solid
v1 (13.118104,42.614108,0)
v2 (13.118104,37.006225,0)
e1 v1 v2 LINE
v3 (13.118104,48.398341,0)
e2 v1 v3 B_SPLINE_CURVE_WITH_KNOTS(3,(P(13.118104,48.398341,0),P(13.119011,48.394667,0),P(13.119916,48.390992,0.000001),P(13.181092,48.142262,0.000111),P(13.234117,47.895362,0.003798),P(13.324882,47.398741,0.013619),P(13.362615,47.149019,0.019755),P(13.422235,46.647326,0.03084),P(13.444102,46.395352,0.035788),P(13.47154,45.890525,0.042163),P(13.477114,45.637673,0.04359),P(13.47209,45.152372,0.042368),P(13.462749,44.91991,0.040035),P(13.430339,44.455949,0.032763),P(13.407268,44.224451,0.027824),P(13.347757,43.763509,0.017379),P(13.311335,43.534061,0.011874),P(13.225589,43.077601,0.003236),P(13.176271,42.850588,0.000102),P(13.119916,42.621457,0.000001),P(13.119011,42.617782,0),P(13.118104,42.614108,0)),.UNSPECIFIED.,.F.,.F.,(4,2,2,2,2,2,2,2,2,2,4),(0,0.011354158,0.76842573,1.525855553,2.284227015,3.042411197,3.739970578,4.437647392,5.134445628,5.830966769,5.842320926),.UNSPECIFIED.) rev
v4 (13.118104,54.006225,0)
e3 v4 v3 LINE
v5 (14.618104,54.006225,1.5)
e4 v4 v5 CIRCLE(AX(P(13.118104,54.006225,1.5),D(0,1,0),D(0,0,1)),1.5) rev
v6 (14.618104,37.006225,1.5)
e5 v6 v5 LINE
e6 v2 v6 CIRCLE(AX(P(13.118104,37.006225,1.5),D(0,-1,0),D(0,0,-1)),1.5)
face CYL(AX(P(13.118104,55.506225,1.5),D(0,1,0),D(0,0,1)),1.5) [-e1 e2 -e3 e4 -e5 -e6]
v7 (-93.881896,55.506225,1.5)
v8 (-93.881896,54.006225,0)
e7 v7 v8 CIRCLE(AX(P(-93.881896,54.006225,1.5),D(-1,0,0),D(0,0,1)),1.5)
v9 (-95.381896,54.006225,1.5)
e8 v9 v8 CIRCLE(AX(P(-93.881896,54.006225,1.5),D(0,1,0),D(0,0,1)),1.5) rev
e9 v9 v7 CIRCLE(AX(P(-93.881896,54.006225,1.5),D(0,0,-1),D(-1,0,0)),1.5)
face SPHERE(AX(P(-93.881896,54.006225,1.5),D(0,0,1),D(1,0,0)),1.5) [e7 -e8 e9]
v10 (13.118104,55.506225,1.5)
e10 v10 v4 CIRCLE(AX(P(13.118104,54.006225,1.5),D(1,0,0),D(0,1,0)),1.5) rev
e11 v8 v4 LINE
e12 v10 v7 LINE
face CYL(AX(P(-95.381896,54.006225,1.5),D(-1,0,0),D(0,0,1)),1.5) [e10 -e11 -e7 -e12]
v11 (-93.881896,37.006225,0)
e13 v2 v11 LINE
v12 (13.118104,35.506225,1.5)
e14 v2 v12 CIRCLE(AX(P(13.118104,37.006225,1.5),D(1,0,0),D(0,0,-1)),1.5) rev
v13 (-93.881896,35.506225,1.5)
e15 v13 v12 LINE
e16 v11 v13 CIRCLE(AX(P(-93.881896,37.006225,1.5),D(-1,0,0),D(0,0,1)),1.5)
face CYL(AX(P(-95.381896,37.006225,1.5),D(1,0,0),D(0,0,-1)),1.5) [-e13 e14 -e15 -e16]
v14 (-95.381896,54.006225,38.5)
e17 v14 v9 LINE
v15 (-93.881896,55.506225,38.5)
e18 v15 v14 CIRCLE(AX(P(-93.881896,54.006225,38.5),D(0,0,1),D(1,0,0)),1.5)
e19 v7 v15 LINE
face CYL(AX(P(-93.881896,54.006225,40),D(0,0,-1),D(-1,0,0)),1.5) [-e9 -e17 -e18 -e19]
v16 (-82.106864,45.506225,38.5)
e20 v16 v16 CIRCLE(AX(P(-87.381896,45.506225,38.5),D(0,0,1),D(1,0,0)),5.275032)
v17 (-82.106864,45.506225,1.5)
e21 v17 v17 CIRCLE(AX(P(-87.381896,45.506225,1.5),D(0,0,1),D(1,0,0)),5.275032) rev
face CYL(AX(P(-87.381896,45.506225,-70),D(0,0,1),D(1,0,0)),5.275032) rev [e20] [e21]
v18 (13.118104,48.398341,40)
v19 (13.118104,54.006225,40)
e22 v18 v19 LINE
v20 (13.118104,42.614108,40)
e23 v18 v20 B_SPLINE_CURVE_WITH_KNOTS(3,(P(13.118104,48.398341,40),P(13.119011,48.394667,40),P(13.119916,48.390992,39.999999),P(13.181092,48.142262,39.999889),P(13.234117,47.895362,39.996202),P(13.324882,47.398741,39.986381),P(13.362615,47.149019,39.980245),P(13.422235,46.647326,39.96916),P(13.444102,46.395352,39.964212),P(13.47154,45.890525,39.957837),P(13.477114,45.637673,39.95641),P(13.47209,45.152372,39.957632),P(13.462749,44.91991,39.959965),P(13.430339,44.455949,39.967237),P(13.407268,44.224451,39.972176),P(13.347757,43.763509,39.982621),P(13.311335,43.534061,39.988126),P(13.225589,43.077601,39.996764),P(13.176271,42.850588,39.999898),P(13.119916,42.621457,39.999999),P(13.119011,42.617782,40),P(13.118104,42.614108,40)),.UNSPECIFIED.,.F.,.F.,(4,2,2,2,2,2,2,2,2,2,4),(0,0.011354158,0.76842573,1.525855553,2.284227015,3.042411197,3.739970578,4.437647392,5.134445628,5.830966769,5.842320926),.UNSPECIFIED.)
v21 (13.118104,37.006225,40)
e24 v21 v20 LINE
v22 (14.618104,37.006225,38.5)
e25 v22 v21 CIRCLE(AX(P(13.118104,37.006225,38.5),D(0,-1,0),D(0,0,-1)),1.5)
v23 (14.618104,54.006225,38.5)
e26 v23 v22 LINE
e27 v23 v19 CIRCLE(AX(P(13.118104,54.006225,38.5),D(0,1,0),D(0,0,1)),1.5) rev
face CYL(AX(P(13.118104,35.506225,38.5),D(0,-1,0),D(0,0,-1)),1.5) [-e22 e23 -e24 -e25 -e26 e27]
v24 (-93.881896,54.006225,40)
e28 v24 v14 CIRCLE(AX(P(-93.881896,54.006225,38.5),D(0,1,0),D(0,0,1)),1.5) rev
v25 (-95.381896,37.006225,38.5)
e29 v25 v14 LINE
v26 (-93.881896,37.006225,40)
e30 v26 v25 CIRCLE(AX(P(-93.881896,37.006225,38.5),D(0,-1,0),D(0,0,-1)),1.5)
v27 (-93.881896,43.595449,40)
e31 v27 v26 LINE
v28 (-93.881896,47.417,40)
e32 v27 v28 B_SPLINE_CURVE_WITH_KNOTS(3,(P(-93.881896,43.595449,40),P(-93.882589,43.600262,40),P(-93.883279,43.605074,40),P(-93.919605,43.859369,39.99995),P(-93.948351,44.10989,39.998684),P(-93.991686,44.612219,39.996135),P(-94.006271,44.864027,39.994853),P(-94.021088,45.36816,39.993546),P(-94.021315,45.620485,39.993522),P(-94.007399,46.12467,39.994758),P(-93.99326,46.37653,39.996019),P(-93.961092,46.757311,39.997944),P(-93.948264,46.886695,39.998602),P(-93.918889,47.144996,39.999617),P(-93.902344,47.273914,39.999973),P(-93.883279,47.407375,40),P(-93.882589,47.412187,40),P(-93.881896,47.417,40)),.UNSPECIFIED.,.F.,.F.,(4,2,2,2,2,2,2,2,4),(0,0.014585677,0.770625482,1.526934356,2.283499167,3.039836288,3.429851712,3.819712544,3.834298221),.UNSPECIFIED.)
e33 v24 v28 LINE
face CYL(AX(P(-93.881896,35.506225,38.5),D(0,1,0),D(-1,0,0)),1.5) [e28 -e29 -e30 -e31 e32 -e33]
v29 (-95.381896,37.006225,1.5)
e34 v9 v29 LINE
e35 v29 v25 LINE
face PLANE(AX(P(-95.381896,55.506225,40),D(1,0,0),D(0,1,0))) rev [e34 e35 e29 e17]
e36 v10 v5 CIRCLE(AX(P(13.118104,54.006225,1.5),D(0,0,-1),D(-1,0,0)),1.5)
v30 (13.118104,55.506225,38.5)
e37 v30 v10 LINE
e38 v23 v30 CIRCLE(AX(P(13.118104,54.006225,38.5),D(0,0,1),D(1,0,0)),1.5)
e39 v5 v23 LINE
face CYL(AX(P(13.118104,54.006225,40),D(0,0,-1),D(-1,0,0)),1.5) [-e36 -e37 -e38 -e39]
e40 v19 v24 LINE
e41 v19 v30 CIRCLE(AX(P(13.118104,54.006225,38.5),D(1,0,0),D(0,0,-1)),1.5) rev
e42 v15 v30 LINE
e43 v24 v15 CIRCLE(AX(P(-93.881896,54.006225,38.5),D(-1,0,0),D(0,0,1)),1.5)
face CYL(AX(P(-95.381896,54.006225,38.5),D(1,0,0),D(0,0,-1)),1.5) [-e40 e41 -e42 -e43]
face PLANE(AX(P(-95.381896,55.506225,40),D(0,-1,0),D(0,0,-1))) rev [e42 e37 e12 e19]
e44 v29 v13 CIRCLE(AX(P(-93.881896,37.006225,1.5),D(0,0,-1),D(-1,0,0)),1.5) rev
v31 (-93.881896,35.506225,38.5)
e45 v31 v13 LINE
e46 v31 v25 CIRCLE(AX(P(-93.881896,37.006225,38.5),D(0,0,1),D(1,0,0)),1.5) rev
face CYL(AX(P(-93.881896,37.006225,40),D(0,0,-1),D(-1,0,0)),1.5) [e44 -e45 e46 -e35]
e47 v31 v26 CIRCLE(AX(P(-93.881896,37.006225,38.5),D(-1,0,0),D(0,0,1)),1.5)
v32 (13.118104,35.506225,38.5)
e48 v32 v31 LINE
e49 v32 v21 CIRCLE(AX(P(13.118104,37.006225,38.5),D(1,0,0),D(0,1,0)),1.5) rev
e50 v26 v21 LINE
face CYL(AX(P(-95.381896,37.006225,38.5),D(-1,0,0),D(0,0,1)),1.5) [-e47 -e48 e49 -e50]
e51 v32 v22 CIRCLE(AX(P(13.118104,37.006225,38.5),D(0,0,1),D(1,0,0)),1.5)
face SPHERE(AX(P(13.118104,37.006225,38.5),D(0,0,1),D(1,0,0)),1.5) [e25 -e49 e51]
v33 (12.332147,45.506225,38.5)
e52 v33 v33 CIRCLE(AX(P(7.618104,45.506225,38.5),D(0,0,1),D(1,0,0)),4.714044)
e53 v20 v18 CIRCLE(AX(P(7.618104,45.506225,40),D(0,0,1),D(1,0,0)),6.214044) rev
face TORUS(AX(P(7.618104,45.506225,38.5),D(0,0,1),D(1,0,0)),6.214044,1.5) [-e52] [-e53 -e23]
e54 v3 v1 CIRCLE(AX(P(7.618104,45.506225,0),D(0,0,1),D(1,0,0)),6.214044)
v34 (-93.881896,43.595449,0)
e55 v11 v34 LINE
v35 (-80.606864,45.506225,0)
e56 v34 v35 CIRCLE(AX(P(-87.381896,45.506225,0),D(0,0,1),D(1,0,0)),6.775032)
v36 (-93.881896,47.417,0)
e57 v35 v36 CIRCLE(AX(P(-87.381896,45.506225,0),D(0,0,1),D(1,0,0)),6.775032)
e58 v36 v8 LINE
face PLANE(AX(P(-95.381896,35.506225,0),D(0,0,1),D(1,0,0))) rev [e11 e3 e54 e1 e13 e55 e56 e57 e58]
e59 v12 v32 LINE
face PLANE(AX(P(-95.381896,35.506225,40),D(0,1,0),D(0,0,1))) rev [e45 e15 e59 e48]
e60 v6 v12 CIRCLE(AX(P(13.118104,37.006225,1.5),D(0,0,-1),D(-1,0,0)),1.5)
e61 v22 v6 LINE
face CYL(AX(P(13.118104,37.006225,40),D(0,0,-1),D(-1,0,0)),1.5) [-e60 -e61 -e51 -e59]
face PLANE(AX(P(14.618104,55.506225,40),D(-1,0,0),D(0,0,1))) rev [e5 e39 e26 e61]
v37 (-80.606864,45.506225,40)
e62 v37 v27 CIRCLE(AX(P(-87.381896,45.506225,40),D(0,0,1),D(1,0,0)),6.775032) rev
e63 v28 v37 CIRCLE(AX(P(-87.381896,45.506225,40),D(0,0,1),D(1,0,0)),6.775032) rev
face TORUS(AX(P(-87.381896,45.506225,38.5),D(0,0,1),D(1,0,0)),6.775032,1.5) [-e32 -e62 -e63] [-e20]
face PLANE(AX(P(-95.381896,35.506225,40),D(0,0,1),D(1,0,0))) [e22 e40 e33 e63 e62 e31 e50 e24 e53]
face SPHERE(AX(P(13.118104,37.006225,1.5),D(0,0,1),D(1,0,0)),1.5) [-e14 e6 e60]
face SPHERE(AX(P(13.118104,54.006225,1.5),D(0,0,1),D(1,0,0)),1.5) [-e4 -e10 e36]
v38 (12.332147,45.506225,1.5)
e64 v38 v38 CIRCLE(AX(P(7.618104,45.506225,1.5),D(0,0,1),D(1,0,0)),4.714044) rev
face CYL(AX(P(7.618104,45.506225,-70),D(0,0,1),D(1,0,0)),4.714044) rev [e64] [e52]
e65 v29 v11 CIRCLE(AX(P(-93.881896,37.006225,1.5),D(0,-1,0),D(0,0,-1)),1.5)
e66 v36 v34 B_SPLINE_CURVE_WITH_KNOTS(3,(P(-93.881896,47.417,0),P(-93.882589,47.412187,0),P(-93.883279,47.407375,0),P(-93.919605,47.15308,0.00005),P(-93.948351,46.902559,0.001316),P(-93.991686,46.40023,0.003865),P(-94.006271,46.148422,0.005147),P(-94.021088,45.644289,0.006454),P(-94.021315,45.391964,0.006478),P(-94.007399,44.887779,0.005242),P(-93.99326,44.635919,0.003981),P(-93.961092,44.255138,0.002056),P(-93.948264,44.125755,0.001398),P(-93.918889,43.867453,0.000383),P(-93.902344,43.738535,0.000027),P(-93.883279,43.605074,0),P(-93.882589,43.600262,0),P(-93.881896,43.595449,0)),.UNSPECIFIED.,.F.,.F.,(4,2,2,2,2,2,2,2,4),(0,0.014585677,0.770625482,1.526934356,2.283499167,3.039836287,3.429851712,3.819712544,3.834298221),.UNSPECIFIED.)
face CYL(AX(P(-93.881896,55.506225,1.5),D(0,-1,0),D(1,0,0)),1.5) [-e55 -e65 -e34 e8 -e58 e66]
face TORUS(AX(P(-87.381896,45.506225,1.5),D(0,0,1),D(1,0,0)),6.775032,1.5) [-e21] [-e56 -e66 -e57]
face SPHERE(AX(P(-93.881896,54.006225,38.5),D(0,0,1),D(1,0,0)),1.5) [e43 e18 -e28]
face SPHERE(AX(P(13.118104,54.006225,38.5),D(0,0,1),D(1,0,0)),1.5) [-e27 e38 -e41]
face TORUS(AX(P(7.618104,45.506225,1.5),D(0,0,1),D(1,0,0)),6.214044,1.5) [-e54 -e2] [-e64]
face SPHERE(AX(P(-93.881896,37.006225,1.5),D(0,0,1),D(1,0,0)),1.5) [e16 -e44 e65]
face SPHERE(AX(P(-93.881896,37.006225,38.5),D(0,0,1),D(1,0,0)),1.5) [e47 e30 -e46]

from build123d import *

# Parameters (mm, degrees)
SKETCH1_W      = 110
SKETCH1_H      = 20
EXTRUDE1_DEPTH = 40
SKETCH2_R      = 5.275032214
SKETCH2_R_2    = 4.714043742
EXTRUDE2_DEPTH = 110
FILLET1_R      = 1.5


with BuildPart() as part:
    # Sketch1 → Extrude1 (new body)
    with BuildSketch(Plane.XY):
        with Locations((-40.381896345, 45.506224595)):
            Rectangle(SKETCH1_W, SKETCH1_H)
    extrude(amount=EXTRUDE1_DEPTH)

    # Sketch2 → Extrude2 (cut)
    with BuildSketch(Plane.XY.offset(40)):
        with Locations((-87.381896345, 45.506224595)):
            Circle(SKETCH2_R)
        with Locations((7.618103655, 45.506224595)):
            Circle(SKETCH2_R_2)
    extrude(amount=-EXTRUDE2_DEPTH, mode=Mode.SUBTRACT)

    # Fillet1
    # the kernel refuses this fillet: 1.5 mm, written as the material it takes off along each edge
    with BuildSketch(Plane(origin=(13.118103655, 54.006224595, 38.5), x_dir=(1, 0, 0), z_dir=(0, 1, 0))) as fillet1_piece_1_section:
        Polygon((0, 0), (FILLET1_R, 0), (FILLET1_R, -FILLET1_R), (0, -FILLET1_R), align=None)
    fillet1_piece_1 = extrude(amount=FILLET1_R, mode=Mode.PRIVATE)
    fillet1_piece_1 = fillet1_piece_1 - Plane(origin=(13.118103655, 54.006224595, 38.5), x_dir=(-0.7071067811865475, 0, -0.7071067811865475), z_dir=(0, 1, 0)) * Sphere(FILLET1_R, mode=Mode.PRIVATE)
    add(fillet1_piece_1, mode=Mode.SUBTRACT)
    with BuildSketch(Plane(origin=(13.118103655, 37.006224595, 38.5), x_dir=(0, 0, 1), z_dir=(1, 0, 0))) as fillet1_piece_2_section:
        Polygon((0, 0), (FILLET1_R, 0), (FILLET1_R, FILLET1_R), (0, FILLET1_R), align=None)
    fillet1_piece_2 = extrude(amount=FILLET1_R, mode=Mode.PRIVATE)
    fillet1_piece_2 = fillet1_piece_2 - Plane(origin=(13.118103655, 37.006224595, 38.5), x_dir=(0, 0.7071067811865475, -0.7071067811865475), z_dir=(1, 0, 0)) * Sphere(FILLET1_R, mode=Mode.PRIVATE)
    add(fillet1_piece_2, mode=Mode.SUBTRACT)
    with BuildSketch(Plane(origin=(-93.881896345, 54.006224595, 38.5), x_dir=(-1, 0, 0), z_dir=(0, 1, 0))) as fillet1_piece_3_section:
        Polygon((0, 0), (FILLET1_R, 0), (FILLET1_R, FILLET1_R), (0, FILLET1_R), align=None)
    fillet1_piece_3 = extrude(amount=FILLET1_R, mode=Mode.PRIVATE)
    fillet1_piece_3 = fillet1_piece_3 - Plane(origin=(-93.881896345, 54.006224595, 38.5), x_dir=(0.7071067811865475, 0, -0.7071067811865475), z_dir=(0, 1, 0)) * Sphere(FILLET1_R, mode=Mode.PRIVATE)
    add(fillet1_piece_3, mode=Mode.SUBTRACT)
    with BuildSketch(Plane(origin=(-93.881896345, 37.006224595, 38.5), x_dir=(0, 0, 1), z_dir=(-1, 0, 0))) as fillet1_piece_4_section:
        Polygon((0, 0), (FILLET1_R, 0), (FILLET1_R, -FILLET1_R), (0, -FILLET1_R), align=None)
    fillet1_piece_4 = extrude(amount=FILLET1_R, mode=Mode.PRIVATE)
    fillet1_piece_4 = fillet1_piece_4 - Plane(origin=(-93.881896345, 37.006224595, 38.5), x_dir=(0, 0.7071067811865475, -0.7071067811865475), z_dir=(-1, 0, 0)) * Sphere(FILLET1_R, mode=Mode.PRIVATE)
    add(fillet1_piece_4, mode=Mode.SUBTRACT)
    with BuildSketch(Plane(origin=(-93.881896345, 54.006224595, 1.5), x_dir=(-1, 0, 0), z_dir=(0, 1, 0))) as fillet1_piece_5_section:
        Polygon((0, 0), (FILLET1_R, 0), (FILLET1_R, -FILLET1_R), (0, -FILLET1_R), align=None)
    fillet1_piece_5 = extrude(amount=FILLET1_R, mode=Mode.PRIVATE)
    fillet1_piece_5 = fillet1_piece_5 - Plane(origin=(-93.881896345, 54.006224595, 1.5), x_dir=(0.7071067811865475, 0, 0.7071067811865475), z_dir=(0, 1, 0)) * Sphere(FILLET1_R, mode=Mode.PRIVATE)
    add(fillet1_piece_5, mode=Mode.SUBTRACT)
    with BuildSketch(Plane(origin=(13.118103655, 54.006224595, 1.5), x_dir=(1, 0, 0), z_dir=(0, 1, 0))) as fillet1_piece_6_section:
        Polygon((0, 0), (FILLET1_R, 0), (FILLET1_R, FILLET1_R), (0, FILLET1_R), align=None)
    fillet1_piece_6 = extrude(amount=FILLET1_R, mode=Mode.PRIVATE)
    fillet1_piece_6 = fillet1_piece_6 - Plane(origin=(13.118103655, 54.006224595, 1.5), x_dir=(-0.7071067811865475, 0, 0.7071067811865475), z_dir=(0, 1, 0)) * Sphere(FILLET1_R, mode=Mode.PRIVATE)
    add(fillet1_piece_6, mode=Mode.SUBTRACT)
    with BuildSketch(Plane(origin=(13.118103655, 37.006224595, 1.5), x_dir=(0, 0, -1), z_dir=(1, 0, 0))) as fillet1_piece_7_section:
        Polygon((0, 0), (FILLET1_R, 0), (FILLET1_R, -FILLET1_R), (0, -FILLET1_R), align=None)
    fillet1_piece_7 = extrude(amount=FILLET1_R, mode=Mode.PRIVATE)
    fillet1_piece_7 = fillet1_piece_7 - Plane(origin=(13.118103655, 37.006224595, 1.5), x_dir=(0, 0.7071067811865475, 0.7071067811865475), z_dir=(1, 0, 0)) * Sphere(FILLET1_R, mode=Mode.PRIVATE)
    add(fillet1_piece_7, mode=Mode.SUBTRACT)
    with BuildSketch(Plane(origin=(-93.881896345, 37.006224595, 1.5), x_dir=(0, 0, -1), z_dir=(-1, 0, 0))) as fillet1_piece_8_section:
        Polygon((0, 0), (FILLET1_R, 0), (FILLET1_R, FILLET1_R), (0, FILLET1_R), align=None)
    fillet1_piece_8 = extrude(amount=FILLET1_R, mode=Mode.PRIVATE)
    fillet1_piece_8 = fillet1_piece_8 - Plane(origin=(-93.881896345, 37.006224595, 1.5), x_dir=(0, 0.7071067811865475, 0.7071067811865475), z_dir=(-1, 0, 0)) * Sphere(FILLET1_R, mode=Mode.PRIVATE)
    add(fillet1_piece_8, mode=Mode.SUBTRACT)
    with BuildSketch(Plane(origin=(14.618103655, 54.006224595, 40), x_dir=(0, 0, -1), z_dir=(0, -1, 0)), Plane(origin=(-95.381896345, 37.006224595, 40), x_dir=(0, 0, -1), z_dir=(0, 1, 0))) as fillet1_piece_9:
        with BuildLine():
            CenterArc((FILLET1_R, -FILLET1_R), FILLET1_R, 90, 90)
            Line((0, -FILLET1_R), (0, 0))
            Line((0, 0), (FILLET1_R, 0))
        make_face()
    extrude(amount=17, mode=Mode.SUBTRACT)
    with BuildSketch(Plane(origin=(-93.881896345, 55.506224595, 40), x_dir=(0, 0, -1), z_dir=(1, 0, 0)), Plane(origin=(13.118103655, 35.506224595, 0), x_dir=(0, 1, 0), z_dir=(-1, 0, 0))) as fillet1_piece_10:
        with BuildLine():
            CenterArc((FILLET1_R, -FILLET1_R), FILLET1_R, 90, 90)
            Line((0, -FILLET1_R), (0, 0))
            Line((0, 0), (FILLET1_R, 0))
        make_face()
    extrude(amount=107, mode=Mode.SUBTRACT)
    with BuildSketch(Plane(origin=(-87.381896345, 45.506224595, 0), x_dir=(1, 0, 0), z_dir=(0, -1, 0))) as fillet1_piece_11:
        with BuildLine():
            CenterArc((5.275032214 + FILLET1_R, FILLET1_R), FILLET1_R, 180, 90)
            Line((5.275032214, FILLET1_R), (5.275032214, 0))
            Line((5.275032214, 0), (5.275032214 + FILLET1_R, 0))
        make_face()
    revolve(axis=Axis((-87.381896345, 45.506224595, 0), (0, 0, 1)), mode=Mode.SUBTRACT)
    with BuildSketch(Plane(origin=(-87.381896345, 45.506224595, 40), x_dir=(1, 0, 0), z_dir=(0, -1, 0))) as fillet1_piece_12:
        with BuildLine():
            CenterArc((5.275032214 + FILLET1_R, -FILLET1_R), FILLET1_R, 90, 90)
            Line((5.275032214, -FILLET1_R), (5.275032214, 0))
            Line((5.275032214, 0), (5.275032214 + FILLET1_R, 0))
        make_face()
    revolve(axis=Axis((-87.381896345, 45.506224595, 40), (0, 0, 1)), mode=Mode.SUBTRACT)
    with BuildSketch(Plane(origin=(7.618103655, 45.506224595, 0), x_dir=(1, 0, 0), z_dir=(0, -1, 0))) as fillet1_piece_13:
        with BuildLine():
            CenterArc((4.714043742 + FILLET1_R, FILLET1_R), FILLET1_R, 180, 90)
            Line((4.714043742, FILLET1_R), (4.714043742, 0))
            Line((4.714043742, 0), (4.714043742 + FILLET1_R, 0))
        make_face()
    revolve(axis=Axis((7.618103655, 45.506224595, 0), (0, 0, 1)), mode=Mode.SUBTRACT)
    with BuildSketch(Plane(origin=(7.618103655, 45.506224595, 40), x_dir=(1, 0, 0), z_dir=(0, -1, 0))) as fillet1_piece_14:
        with BuildLine():
            CenterArc((4.714043742 + FILLET1_R, -FILLET1_R), FILLET1_R, 90, 90)
            Line((4.714043742, -FILLET1_R), (4.714043742, 0))
            Line((4.714043742, 0), (4.714043742 + FILLET1_R, 0))
        make_face()
    revolve(axis=Axis((7.618103655, 45.506224595, 40), (0, 0, 1)), mode=Mode.SUBTRACT)
    with BuildSketch(Plane(origin=(-93.881896345, 55.506224595, 0), x_dir=(0, 0, 1), z_dir=(1, 0, 0)), Plane(origin=(13.118103655, 35.506224595, 40), x_dir=(0, 1, 0), z_dir=(-1, 0, 0))) as fillet1_piece_15:
        with BuildLine():
            CenterArc((FILLET1_R, FILLET1_R), FILLET1_R, 180, 90)
            Line((0, FILLET1_R), (0, 0))
            Line((0, 0), (FILLET1_R, 0))
        make_face()
    extrude(amount=107, mode=Mode.SUBTRACT)
    with BuildSketch(Plane(origin=(14.618103655, 54.006224595, 0), x_dir=(0, 0, 1), z_dir=(0, -1, 0)), Plane(origin=(-95.381896345, 37.006224595, 0), x_dir=(0, 0, 1), z_dir=(0, 1, 0))) as fillet1_piece_16:
        with BuildLine():
            CenterArc((FILLET1_R, FILLET1_R), FILLET1_R, 180, 90)
            Line((0, FILLET1_R), (0, 0))
            Line((0, 0), (FILLET1_R, 0))
        make_face()
    extrude(amount=17, mode=Mode.SUBTRACT)
    with BuildSketch(Plane(origin=(-95.381896345, 55.506224595, 1.5), x_dir=(1, 0, 0), z_dir=(0, 0, 1)), Plane(origin=(-95.381896345, 35.506224595, 1.5), x_dir=(0, 1, 0), z_dir=(0, 0, 1))) as fillet1_piece_17:
        with BuildLine():
            CenterArc((FILLET1_R, -FILLET1_R), FILLET1_R, 90, 90)
            Line((0, -FILLET1_R), (0, 0))
            Line((0, 0), (FILLET1_R, 0))
        make_face()
    extrude(amount=37, mode=Mode.SUBTRACT)
    with BuildSketch(Plane(origin=(14.618103655, 55.506224595, 1.5), x_dir=(-1, 0, 0), z_dir=(0, 0, 1)), Plane(origin=(14.618103655, 35.506224595, 1.5), x_dir=(0, 1, 0), z_dir=(0, 0, 1))) as fillet1_piece_18:
        with BuildLine():
            CenterArc((FILLET1_R, FILLET1_R), FILLET1_R, 180, 90)
            Line((0, FILLET1_R), (0, 0))
            Line((0, 0), (FILLET1_R, 0))
        make_face()
    extrude(amount=37, mode=Mode.SUBTRACT)


solid = part.part
